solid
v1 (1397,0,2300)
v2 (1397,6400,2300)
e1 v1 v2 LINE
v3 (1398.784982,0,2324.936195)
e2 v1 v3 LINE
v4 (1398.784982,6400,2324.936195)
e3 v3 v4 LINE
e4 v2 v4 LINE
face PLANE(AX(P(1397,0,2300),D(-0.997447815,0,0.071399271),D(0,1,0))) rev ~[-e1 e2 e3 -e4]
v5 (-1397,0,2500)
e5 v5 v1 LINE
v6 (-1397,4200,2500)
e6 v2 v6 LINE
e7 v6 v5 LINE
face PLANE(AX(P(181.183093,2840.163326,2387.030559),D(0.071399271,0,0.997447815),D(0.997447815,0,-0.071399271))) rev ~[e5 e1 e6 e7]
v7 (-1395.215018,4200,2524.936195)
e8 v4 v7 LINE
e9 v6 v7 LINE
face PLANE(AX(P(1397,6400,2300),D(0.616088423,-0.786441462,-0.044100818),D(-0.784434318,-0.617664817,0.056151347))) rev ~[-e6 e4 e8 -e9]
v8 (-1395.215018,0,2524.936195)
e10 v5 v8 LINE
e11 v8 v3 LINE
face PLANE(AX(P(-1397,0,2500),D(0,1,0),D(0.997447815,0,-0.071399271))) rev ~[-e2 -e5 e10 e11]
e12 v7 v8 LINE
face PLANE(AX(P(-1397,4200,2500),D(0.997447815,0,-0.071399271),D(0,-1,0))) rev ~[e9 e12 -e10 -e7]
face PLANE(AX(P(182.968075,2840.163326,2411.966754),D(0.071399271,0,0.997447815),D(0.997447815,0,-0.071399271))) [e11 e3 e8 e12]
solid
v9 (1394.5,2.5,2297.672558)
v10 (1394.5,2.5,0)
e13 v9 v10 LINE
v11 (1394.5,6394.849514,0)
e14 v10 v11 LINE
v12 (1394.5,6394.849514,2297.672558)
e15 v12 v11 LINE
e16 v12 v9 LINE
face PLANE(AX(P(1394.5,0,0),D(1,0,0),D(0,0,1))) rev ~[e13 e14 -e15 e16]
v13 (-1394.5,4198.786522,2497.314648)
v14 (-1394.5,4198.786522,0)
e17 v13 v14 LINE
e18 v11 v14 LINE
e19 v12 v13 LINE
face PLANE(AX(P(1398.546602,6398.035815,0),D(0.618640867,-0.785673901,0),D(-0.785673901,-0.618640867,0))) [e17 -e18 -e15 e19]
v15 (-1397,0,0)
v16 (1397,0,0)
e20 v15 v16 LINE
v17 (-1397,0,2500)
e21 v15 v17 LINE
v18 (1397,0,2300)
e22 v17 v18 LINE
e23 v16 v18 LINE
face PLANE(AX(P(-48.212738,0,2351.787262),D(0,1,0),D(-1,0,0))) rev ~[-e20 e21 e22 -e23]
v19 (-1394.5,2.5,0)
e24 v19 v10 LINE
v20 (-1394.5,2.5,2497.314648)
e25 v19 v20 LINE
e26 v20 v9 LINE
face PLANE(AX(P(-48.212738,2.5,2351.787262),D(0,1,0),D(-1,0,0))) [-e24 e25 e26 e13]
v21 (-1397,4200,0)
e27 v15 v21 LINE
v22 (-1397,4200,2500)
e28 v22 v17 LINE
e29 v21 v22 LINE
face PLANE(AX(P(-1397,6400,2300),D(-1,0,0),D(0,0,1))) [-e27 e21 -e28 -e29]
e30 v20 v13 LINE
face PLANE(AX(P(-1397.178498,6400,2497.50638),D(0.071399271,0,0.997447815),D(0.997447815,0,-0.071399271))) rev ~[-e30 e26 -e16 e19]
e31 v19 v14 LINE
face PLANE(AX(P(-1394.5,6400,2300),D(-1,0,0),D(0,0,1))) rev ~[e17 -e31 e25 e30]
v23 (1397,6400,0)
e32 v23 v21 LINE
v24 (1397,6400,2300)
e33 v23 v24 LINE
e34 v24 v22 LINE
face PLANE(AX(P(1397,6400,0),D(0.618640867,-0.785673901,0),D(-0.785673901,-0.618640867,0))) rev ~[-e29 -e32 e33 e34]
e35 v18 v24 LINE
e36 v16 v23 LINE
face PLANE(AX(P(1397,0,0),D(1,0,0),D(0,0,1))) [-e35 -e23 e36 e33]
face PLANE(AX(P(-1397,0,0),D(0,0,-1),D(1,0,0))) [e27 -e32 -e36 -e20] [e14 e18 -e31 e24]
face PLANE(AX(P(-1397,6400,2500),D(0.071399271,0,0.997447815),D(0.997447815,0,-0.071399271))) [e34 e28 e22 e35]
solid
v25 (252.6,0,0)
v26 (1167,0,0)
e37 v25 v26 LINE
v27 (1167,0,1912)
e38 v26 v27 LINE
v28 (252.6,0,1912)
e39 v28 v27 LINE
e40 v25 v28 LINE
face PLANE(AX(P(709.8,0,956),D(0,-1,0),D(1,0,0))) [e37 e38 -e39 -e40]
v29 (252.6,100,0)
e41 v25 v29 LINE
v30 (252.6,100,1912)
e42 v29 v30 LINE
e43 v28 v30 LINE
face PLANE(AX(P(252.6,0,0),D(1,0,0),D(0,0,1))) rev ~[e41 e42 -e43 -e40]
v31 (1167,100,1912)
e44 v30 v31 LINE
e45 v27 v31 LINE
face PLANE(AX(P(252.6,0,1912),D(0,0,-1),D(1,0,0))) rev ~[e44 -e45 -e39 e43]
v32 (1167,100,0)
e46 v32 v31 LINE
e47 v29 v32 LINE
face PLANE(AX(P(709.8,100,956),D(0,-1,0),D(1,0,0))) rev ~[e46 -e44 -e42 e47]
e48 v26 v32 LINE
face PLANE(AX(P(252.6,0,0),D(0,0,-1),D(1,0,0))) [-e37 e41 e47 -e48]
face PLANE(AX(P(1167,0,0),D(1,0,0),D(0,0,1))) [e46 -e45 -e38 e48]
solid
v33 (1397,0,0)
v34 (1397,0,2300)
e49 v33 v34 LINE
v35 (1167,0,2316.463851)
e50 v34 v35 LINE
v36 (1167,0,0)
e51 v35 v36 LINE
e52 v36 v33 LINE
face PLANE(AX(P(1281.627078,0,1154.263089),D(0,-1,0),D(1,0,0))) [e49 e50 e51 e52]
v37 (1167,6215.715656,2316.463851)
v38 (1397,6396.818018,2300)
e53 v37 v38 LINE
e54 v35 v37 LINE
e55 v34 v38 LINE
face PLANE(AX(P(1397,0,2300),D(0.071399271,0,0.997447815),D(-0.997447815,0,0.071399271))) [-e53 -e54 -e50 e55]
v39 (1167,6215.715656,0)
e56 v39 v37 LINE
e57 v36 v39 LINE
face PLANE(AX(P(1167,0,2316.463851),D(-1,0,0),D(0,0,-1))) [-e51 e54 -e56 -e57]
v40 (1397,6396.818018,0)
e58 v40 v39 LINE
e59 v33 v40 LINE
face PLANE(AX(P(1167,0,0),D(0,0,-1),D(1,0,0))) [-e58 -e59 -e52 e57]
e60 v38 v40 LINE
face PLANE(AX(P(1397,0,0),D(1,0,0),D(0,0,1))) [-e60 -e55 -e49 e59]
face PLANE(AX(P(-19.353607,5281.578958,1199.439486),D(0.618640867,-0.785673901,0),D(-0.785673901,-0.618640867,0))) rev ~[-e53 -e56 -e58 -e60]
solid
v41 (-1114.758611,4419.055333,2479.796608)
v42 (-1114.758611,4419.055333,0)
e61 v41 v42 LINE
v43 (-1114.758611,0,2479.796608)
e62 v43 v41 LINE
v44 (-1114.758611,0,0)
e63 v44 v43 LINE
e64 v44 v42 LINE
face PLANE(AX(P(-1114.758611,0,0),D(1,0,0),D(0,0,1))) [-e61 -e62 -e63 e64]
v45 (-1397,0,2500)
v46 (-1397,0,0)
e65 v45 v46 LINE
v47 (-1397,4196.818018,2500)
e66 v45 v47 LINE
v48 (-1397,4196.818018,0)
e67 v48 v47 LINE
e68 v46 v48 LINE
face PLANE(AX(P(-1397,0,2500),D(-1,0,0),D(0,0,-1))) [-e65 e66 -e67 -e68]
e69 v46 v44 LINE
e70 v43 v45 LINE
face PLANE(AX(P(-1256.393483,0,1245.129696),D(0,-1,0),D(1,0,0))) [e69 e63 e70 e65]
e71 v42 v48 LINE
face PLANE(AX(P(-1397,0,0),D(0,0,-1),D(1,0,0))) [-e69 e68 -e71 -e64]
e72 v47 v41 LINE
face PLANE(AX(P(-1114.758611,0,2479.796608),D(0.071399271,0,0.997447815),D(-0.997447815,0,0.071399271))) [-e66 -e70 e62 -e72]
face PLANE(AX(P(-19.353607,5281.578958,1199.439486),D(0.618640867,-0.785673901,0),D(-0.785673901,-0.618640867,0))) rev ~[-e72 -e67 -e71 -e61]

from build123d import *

# Parameters (mm, degrees)
F0_W      = 1397
F0_H      = 2300
F1_DEPTH  = 6400
F3_DEPTH  = 6400
F5_REACH  = 6056.1837849536
F6_T      = -2.5
F9_DEPTH  = 25
F10_REACH = 8727.8551134481
F11_REACH = 8915.8825953498
F7_W      = 914.4
F7_H      = 1912
F12_DEPTH = 100


with BuildPart() as f1:
    # F0 (on Front) → F1 (new body)
    with BuildSketch(Plane.XZ):
        with Locations((-698.5, 1150)):
            Rectangle(F0_W, F0_H)
        with Locations((698.5, 1150)):
            Rectangle(F0_W, F0_H)
    extrude(amount=-F1_DEPTH)

    # F2 (on face) → F3 (join, through all)
    with BuildSketch(Plane(origin=(0, 6400, 0), x_dir=(-1, 0, 0), z_dir=(0, 1, 0))):
        Polygon((-1397, 2300), (1397, 2300), (1397, 2500), align=None)
    extrude(amount=-F3_DEPTH)

    f5_end = f1.faces().sort_by_distance((0, 3200, 2400))[0]
    # F4 (on face) → F5 (cut, up to a face of the model that its end follows)
    with BuildSketch(Plane(origin=(0, 0, 0), x_dir=(1, 0, 0), z_dir=(0, 0, -1))):
        Polygon((1397, -6400), (-1397, -4200), (-1397, -6400), align=None)
    f5_long = extrude(amount=-F5_REACH, mode=Mode.PRIVATE)
    add(split(f5_long, bisect_by=f5_end, keep=Keep.BOTTOM, mode=Mode.PRIVATE), mode=Mode.SUBTRACT)

    # F6
    f6_openings = [f1.faces().sort_by_distance(p)[0] for p in [
        (96.647799, 2688.050314, 0),
    ]]
    offset(amount=F6_T, openings=f6_openings)


with BuildPart() as f9:
    # F8 (on face) → F9 (new body)
    with BuildSketch(Plane(origin=(170.9209123735, 0, 2387.7651458573), x_dir=(0.9974478152, 0, -0.071399271), z_dir=(0.071399271, 0, 0.9974478152))):
        Polygon((1229.2162746817, 0), (1229.2162746817, 6400), (-1571.9327752619, 4200), (-1571.9327752619, 0), align=None)
    extrude(amount=F9_DEPTH)


with BuildPart() as f10:
    f10_end = Plane(origin=(-19.3536070615, 5281.5789575885, 1199.4394861824), x_dir=(-0.7856739006, -0.6186408666, 0), z_dir=(0.6186408666, -0.7856739006, 0))
    # F7 (on face) → F10 (new body, up to a plane its end follows)
    with BuildSketch(Plane.XZ):
        Polygon((1167, 1912), (1167, 0), (1397, 0), (1397, 2300), (1167, 2316.4638511095), align=None)
    f10_long = extrude(amount=-F10_REACH, mode=Mode.PRIVATE)
    add(split(f10_long, bisect_by=f10_end, keep=Keep.TOP, mode=Mode.PRIVATE))


with BuildPart() as f11:
    f11_end = Plane(origin=(-19.3536070615, 5281.5789575885, 1199.4394861824), x_dir=(-0.7856739006, -0.6186408666, 0), z_dir=(0.6186408666, -0.7856739006, 0))
    # F7 (on face) → F11 (new body, up to a plane its end follows)
    with BuildSketch(Plane.XZ):
        Polygon((-1397, 0), (-1114.7586107254, 0), (-1114.7586107254, 1912), (-1114.7586107254, 2479.7966077828), (-1397, 2500), align=None)
    f11_long = extrude(amount=-F11_REACH, mode=Mode.PRIVATE)
    add(split(f11_long, bisect_by=f11_end, keep=Keep.TOP, mode=Mode.PRIVATE))


with BuildPart() as f12:
    # F7 (on face) → F12 (new body)
    with BuildSketch(Plane.XZ):
        with Locations((709.8, 956)):
            Rectangle(F7_W, F7_H)
    extrude(amount=-F12_DEPTH)


solid = Compound([f1.part, f9.part, f10.part, f11.part, f12.part])
